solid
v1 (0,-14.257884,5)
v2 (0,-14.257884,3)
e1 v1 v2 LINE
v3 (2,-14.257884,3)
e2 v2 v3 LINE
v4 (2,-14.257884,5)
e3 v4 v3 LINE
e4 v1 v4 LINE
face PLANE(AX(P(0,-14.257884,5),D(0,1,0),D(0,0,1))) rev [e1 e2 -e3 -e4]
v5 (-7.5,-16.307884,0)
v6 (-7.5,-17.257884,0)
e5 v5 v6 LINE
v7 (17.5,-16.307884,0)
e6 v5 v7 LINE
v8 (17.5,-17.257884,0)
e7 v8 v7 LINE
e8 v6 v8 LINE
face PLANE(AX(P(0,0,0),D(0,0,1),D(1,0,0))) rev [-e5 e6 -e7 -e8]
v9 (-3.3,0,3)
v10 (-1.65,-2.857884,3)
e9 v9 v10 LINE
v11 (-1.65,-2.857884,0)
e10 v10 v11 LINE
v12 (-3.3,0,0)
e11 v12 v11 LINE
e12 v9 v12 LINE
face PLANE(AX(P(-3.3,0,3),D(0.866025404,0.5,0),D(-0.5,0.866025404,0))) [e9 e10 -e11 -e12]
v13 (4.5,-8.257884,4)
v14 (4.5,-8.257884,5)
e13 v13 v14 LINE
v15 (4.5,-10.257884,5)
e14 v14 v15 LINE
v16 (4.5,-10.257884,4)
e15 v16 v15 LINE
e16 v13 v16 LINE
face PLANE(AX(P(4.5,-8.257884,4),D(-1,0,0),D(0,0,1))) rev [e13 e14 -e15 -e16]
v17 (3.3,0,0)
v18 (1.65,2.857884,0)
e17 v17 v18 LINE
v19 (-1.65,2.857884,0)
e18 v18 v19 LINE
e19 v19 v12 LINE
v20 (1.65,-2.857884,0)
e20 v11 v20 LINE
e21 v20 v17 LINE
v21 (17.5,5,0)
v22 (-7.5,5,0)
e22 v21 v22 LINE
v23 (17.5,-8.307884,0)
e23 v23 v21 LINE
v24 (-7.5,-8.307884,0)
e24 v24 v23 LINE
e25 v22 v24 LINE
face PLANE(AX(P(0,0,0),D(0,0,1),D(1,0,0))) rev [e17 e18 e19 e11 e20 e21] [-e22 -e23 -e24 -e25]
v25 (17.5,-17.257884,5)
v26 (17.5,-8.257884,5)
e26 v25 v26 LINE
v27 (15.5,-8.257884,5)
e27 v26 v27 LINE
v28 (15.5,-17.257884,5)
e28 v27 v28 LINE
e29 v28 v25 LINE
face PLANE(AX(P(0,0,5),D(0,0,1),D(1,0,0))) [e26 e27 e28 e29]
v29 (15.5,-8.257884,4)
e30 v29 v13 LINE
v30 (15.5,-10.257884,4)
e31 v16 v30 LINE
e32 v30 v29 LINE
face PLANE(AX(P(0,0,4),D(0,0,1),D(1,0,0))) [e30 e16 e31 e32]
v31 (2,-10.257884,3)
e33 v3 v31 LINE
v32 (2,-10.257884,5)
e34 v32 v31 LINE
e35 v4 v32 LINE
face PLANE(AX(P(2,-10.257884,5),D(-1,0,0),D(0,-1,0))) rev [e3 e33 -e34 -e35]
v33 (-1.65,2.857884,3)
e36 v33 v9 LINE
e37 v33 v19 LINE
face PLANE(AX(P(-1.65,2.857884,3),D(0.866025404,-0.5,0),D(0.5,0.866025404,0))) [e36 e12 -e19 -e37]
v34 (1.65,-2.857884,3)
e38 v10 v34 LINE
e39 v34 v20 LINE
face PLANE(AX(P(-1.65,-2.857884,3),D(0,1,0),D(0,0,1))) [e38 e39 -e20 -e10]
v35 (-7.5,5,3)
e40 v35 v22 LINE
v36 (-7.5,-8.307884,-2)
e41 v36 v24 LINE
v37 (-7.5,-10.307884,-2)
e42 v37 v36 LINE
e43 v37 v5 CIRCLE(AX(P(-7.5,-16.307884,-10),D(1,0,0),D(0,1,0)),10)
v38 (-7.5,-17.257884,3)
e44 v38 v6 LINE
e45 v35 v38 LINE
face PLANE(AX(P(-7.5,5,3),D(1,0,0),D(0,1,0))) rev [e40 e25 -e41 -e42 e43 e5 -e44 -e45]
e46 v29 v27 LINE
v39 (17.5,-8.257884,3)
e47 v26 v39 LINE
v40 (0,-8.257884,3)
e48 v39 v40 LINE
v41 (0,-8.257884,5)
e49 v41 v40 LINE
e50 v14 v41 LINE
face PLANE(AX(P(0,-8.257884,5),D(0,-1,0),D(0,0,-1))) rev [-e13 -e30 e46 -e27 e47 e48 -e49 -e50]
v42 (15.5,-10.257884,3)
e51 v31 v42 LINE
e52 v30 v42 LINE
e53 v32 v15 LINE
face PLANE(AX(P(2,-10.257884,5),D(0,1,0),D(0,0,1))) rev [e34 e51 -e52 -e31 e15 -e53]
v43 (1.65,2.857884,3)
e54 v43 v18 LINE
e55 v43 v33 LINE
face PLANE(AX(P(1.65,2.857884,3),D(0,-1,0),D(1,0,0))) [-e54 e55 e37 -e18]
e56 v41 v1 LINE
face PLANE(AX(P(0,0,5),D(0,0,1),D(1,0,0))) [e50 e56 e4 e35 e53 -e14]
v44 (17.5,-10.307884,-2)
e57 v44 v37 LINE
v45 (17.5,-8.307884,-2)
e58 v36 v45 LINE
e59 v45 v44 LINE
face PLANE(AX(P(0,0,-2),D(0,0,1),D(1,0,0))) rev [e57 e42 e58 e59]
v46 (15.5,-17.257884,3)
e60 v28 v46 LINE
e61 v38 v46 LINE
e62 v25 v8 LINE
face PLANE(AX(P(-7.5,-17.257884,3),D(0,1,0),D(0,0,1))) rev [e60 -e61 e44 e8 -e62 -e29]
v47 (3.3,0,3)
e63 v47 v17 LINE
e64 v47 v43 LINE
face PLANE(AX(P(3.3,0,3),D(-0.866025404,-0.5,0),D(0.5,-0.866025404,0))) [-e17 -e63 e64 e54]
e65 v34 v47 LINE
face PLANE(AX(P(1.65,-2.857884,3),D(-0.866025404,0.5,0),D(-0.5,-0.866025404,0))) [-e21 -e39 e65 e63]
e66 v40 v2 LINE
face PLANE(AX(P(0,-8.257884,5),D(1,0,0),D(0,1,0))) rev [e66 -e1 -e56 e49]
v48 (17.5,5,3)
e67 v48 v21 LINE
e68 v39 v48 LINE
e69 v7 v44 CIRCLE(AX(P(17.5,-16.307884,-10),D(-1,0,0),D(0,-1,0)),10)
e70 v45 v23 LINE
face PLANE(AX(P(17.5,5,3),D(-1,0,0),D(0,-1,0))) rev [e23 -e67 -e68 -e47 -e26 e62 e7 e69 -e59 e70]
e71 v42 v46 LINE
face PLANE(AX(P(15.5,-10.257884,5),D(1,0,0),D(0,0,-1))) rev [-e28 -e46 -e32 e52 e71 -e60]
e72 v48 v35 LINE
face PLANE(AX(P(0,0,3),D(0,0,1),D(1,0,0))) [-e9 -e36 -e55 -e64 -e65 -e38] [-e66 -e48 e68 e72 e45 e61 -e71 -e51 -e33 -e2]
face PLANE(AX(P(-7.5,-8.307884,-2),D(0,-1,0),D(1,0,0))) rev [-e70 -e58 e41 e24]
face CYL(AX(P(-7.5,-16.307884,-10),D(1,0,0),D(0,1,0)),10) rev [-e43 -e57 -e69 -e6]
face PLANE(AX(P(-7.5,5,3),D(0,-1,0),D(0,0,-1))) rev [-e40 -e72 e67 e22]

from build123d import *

# Parameters (mm, degrees)
ESQUISSE1_W             = 25
ESQUISSE1_H             = 22.257883832
BOSS_EXTRU_1_DEPTH      = 3
ESQUISSE2_W             = 25
ESQUISSE2_H             = 2
BOSS_EXTRU_2_DEPTH      = 2
BOSS_EXTRU_3_DEPTH      = 2
ESQUISSE6_W             = 11
ESQUISSE6_H             = 2
ENL_V_MAT_EXTRU_2_DEPTH = 1
CONG_1_R                = 10


with BuildPart() as part:
    # Esquisse1 → Boss.-Extru.1 (new body)
    with BuildSketch(Plane.XY):
        with Locations((5, -6.128941916)):
            Rectangle(ESQUISSE1_W, ESQUISSE1_H)
        Polygon((1.65, -2.857883832), (3.3, 0), (1.65, 2.857883832), (-1.65, 2.857883832), (-3.3, 0), (-1.65, -2.857883832), align=None, mode=Mode.SUBTRACT)
    extrude(amount=BOSS_EXTRU_1_DEPTH)

    # Esquisse2 → Boss.-Extru.2 (add)
    with BuildSketch(Plane(origin=(0, 0, 0), x_dir=(-1, 0, 0), z_dir=(0, 0, -1))):
        with Locations((-5, -9.307883832)):
            Rectangle(ESQUISSE2_W, ESQUISSE2_H)
    extrude(amount=BOSS_EXTRU_2_DEPTH)

    # Esquisse3 → Boss.-Extru.3 (add)
    with BuildSketch(Plane.XY.offset(3)):
        Polygon((0, -8.257883832), (17.5, -8.257883832), (17.5, -17.257883832), (15.5, -17.257883832), (15.5, -10.257883832), (2, -10.257883832), (2, -14.257883832), (0, -14.257883832), align=None)
    extrude(amount=BOSS_EXTRU_3_DEPTH)

    # Esquisse6 → Enlèv. mat.-Extru.2 (cut)
    with BuildSketch(Plane.XY.offset(5)):
        with Locations((10, -9.257883832)):
            Rectangle(ESQUISSE6_W, ESQUISSE6_H)
    extrude(amount=-ENL_V_MAT_EXTRU_2_DEPTH, mode=Mode.SUBTRACT)

    # Congé1
    # the kernel refuses this fillet: 10 mm, written as the material it adds along each edge
    with BuildSketch(Plane(origin=(17.5, -10.307883832, 0), x_dir=(0, -1, 0), z_dir=(-1, 0, 0))) as cong_1_piece_1:
        with BuildLine():
            CenterArc((6, -10), CONG_1_R, 90, 36.869897646)
            Line((0, -2), (0, 0))
            Line((0, 0), (6, 0))
        make_face()
    extrude(amount=25)


solid = part.part
